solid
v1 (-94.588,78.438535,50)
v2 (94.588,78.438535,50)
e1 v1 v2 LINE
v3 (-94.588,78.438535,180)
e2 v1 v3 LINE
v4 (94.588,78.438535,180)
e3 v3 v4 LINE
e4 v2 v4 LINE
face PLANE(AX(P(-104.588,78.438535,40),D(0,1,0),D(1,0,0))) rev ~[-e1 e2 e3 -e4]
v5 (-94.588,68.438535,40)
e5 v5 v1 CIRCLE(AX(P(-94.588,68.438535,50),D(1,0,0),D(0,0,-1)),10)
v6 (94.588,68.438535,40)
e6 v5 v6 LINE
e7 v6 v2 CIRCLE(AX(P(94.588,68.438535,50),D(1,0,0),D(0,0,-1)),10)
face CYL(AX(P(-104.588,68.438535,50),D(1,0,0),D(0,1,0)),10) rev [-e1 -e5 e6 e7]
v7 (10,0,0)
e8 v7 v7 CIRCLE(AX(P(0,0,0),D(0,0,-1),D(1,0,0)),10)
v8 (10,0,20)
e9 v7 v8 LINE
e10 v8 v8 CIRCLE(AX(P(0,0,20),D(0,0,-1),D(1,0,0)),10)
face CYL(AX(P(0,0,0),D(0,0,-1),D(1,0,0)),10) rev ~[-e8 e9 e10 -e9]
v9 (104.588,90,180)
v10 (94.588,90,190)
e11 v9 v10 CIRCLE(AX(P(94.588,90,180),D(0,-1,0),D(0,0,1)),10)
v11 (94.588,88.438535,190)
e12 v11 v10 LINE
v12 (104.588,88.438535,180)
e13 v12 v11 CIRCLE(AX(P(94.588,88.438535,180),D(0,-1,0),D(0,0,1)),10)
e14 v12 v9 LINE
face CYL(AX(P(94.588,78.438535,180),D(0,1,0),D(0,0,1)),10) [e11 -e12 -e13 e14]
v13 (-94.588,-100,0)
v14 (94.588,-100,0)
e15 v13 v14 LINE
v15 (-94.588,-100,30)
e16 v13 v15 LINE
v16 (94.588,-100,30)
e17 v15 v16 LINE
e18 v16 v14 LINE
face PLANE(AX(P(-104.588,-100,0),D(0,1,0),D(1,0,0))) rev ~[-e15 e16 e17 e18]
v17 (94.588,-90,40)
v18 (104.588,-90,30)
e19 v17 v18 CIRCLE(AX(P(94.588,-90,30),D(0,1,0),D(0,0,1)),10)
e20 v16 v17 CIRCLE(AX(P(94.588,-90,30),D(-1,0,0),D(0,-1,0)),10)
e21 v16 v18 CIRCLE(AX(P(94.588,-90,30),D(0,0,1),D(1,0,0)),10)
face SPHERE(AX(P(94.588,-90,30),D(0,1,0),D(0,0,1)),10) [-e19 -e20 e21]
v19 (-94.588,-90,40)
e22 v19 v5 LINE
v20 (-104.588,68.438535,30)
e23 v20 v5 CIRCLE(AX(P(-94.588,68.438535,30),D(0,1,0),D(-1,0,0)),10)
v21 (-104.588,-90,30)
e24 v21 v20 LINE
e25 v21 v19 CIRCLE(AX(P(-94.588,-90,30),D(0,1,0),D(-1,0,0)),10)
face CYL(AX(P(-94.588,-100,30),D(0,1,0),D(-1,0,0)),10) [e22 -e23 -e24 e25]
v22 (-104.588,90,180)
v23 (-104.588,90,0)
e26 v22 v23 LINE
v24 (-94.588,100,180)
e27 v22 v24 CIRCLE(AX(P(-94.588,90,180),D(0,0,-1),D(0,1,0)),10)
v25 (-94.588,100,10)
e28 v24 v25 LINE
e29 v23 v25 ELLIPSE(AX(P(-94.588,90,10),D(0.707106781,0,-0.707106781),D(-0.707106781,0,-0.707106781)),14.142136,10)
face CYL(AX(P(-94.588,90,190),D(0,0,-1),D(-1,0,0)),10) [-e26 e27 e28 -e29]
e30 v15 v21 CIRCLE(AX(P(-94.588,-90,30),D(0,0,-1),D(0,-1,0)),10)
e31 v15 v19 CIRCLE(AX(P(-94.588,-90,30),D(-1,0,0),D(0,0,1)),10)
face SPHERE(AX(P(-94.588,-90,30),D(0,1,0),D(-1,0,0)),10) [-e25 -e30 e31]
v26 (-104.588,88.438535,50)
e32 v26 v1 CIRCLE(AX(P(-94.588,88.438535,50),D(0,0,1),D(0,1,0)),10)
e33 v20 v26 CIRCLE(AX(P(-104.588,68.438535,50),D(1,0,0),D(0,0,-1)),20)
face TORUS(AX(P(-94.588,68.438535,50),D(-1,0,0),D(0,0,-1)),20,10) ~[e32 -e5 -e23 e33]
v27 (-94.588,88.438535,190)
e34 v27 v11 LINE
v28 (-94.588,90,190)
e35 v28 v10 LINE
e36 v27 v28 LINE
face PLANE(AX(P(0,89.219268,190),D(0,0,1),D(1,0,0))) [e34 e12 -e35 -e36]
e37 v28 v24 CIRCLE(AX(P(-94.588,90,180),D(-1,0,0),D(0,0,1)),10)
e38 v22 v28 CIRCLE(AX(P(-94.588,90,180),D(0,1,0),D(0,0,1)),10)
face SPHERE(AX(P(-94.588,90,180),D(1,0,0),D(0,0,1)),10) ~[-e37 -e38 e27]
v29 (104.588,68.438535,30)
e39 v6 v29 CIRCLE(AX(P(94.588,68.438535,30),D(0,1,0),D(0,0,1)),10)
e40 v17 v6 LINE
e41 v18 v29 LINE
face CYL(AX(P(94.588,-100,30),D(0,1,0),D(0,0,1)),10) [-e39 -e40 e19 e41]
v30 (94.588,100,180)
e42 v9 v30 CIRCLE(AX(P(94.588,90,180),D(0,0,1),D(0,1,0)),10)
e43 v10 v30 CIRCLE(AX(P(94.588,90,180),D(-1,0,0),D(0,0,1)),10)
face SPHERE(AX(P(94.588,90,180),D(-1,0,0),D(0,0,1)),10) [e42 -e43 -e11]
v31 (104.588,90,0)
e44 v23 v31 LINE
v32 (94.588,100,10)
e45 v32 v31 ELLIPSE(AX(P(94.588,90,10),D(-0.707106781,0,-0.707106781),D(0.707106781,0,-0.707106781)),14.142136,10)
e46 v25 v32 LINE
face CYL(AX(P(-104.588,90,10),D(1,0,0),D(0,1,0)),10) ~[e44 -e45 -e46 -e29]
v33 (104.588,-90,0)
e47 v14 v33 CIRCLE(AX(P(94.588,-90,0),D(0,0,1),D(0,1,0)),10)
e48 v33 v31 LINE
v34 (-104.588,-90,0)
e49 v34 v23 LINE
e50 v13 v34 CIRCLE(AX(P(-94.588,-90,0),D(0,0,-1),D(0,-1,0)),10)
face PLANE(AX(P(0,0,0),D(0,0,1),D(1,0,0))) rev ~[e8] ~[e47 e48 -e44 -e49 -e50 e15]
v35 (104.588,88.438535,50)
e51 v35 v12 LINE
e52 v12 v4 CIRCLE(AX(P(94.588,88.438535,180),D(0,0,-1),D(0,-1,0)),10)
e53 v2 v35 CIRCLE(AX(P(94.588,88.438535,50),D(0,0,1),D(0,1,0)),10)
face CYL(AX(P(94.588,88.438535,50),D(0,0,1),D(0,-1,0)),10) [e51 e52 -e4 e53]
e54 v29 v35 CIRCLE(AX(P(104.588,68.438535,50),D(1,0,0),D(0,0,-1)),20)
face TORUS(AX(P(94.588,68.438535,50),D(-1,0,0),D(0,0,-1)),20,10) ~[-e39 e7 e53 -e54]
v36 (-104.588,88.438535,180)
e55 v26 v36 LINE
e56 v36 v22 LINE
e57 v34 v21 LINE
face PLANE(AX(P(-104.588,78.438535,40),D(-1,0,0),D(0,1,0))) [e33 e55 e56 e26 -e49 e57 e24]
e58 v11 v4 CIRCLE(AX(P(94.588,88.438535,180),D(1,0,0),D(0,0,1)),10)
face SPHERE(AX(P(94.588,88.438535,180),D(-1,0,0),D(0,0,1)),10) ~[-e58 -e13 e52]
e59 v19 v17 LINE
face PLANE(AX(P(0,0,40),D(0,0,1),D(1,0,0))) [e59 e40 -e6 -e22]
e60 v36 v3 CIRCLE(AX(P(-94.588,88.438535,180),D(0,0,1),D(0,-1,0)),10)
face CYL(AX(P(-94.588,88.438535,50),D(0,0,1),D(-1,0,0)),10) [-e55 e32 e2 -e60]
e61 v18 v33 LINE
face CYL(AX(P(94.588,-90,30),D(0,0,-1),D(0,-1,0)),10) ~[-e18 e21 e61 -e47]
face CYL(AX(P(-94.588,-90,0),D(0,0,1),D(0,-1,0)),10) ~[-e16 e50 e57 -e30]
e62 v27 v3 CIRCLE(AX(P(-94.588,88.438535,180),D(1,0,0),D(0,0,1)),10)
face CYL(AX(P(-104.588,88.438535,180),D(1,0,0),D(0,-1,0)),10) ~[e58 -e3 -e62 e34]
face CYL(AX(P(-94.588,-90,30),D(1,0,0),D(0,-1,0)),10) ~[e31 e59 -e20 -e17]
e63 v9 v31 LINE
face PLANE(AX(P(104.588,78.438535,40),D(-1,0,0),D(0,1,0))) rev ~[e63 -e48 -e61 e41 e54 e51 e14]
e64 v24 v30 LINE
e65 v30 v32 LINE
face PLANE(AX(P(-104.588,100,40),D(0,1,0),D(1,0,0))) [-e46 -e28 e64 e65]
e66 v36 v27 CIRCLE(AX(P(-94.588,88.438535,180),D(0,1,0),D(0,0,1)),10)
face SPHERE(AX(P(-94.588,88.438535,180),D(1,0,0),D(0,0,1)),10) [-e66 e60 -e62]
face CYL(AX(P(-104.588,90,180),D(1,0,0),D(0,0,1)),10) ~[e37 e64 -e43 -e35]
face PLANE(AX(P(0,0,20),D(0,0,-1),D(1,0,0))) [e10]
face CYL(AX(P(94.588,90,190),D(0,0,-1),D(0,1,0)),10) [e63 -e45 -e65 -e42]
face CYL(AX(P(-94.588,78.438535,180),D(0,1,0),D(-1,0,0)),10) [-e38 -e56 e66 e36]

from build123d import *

# Parameters (mm, degrees)
F0_W     = 209.176
F0_H     = 200
F1_DEPTH = 40
F2_W     = 209.176
F2_H     = 21.5614646673
F3_DEPTH = 150
F4_R     = 10
F5_DEPTH = 20
F6_F1_R  = 10
F6_F2_R  = 10
F7_R     = 10


with BuildPart() as f1:
    # F0 (on Top) → F1 (new body)
    with BuildSketch(Plane.XY):
        Rectangle(F0_W, F0_H)
    extrude(amount=F1_DEPTH)

    # F2 (on face) → F3 (join)
    with BuildSketch(Plane.XY.offset(40)):
        with Locations((0, 89.2192676663)):
            Rectangle(F2_W, F2_H)
    extrude(amount=F3_DEPTH)

    # F4 (on face) → F5 (cut)
    with BuildSketch(Plane(origin=(0, 0, 0), x_dir=(1, 0, 0), z_dir=(0, 0, -1))):
        Circle(F4_R)
    extrude(amount=-F5_DEPTH, mode=Mode.SUBTRACT)

    # F6: fillet of radius 10 on 10 edges, made by hand

    # F6_f1
    f6_f1_edges = [f1.edges().sort_by_distance(p)[0] for p in [
        (0, 78.4385353327, 40),
    ]]
    fillet(f6_f1_edges, radius=F6_F1_R)

    # F6_f2
    f6_f2_edges = [f1.edges().sort_by_distance(p)[0] for p in [
        (0, 78.4385353327, 190),
        (0, 100, 190),
        (-104.588, 89.2192676663, 190),
        (104.588, 89.2192676663, 190),
        (-104.588, 78.4385353327, 120),
        (104.588, 78.4385353327, 120),
        (104.588, 100, 95),
        (-104.588, 100, 95),
        (0, 100, 0),
        (104.588, 75.5096031445, 42.9289321881),
        (-104.588, 75.5096031445, 42.9289321881),
    ]]
    fillet(f6_f2_edges, radius=F6_F2_R)

    # F7
    f7_edges = [f1.edges().sort_by_distance(p)[0] for p in [
        (0, -100, 40),
    ]]
    fillet(f7_edges, radius=F7_R)


solid = f1.part
